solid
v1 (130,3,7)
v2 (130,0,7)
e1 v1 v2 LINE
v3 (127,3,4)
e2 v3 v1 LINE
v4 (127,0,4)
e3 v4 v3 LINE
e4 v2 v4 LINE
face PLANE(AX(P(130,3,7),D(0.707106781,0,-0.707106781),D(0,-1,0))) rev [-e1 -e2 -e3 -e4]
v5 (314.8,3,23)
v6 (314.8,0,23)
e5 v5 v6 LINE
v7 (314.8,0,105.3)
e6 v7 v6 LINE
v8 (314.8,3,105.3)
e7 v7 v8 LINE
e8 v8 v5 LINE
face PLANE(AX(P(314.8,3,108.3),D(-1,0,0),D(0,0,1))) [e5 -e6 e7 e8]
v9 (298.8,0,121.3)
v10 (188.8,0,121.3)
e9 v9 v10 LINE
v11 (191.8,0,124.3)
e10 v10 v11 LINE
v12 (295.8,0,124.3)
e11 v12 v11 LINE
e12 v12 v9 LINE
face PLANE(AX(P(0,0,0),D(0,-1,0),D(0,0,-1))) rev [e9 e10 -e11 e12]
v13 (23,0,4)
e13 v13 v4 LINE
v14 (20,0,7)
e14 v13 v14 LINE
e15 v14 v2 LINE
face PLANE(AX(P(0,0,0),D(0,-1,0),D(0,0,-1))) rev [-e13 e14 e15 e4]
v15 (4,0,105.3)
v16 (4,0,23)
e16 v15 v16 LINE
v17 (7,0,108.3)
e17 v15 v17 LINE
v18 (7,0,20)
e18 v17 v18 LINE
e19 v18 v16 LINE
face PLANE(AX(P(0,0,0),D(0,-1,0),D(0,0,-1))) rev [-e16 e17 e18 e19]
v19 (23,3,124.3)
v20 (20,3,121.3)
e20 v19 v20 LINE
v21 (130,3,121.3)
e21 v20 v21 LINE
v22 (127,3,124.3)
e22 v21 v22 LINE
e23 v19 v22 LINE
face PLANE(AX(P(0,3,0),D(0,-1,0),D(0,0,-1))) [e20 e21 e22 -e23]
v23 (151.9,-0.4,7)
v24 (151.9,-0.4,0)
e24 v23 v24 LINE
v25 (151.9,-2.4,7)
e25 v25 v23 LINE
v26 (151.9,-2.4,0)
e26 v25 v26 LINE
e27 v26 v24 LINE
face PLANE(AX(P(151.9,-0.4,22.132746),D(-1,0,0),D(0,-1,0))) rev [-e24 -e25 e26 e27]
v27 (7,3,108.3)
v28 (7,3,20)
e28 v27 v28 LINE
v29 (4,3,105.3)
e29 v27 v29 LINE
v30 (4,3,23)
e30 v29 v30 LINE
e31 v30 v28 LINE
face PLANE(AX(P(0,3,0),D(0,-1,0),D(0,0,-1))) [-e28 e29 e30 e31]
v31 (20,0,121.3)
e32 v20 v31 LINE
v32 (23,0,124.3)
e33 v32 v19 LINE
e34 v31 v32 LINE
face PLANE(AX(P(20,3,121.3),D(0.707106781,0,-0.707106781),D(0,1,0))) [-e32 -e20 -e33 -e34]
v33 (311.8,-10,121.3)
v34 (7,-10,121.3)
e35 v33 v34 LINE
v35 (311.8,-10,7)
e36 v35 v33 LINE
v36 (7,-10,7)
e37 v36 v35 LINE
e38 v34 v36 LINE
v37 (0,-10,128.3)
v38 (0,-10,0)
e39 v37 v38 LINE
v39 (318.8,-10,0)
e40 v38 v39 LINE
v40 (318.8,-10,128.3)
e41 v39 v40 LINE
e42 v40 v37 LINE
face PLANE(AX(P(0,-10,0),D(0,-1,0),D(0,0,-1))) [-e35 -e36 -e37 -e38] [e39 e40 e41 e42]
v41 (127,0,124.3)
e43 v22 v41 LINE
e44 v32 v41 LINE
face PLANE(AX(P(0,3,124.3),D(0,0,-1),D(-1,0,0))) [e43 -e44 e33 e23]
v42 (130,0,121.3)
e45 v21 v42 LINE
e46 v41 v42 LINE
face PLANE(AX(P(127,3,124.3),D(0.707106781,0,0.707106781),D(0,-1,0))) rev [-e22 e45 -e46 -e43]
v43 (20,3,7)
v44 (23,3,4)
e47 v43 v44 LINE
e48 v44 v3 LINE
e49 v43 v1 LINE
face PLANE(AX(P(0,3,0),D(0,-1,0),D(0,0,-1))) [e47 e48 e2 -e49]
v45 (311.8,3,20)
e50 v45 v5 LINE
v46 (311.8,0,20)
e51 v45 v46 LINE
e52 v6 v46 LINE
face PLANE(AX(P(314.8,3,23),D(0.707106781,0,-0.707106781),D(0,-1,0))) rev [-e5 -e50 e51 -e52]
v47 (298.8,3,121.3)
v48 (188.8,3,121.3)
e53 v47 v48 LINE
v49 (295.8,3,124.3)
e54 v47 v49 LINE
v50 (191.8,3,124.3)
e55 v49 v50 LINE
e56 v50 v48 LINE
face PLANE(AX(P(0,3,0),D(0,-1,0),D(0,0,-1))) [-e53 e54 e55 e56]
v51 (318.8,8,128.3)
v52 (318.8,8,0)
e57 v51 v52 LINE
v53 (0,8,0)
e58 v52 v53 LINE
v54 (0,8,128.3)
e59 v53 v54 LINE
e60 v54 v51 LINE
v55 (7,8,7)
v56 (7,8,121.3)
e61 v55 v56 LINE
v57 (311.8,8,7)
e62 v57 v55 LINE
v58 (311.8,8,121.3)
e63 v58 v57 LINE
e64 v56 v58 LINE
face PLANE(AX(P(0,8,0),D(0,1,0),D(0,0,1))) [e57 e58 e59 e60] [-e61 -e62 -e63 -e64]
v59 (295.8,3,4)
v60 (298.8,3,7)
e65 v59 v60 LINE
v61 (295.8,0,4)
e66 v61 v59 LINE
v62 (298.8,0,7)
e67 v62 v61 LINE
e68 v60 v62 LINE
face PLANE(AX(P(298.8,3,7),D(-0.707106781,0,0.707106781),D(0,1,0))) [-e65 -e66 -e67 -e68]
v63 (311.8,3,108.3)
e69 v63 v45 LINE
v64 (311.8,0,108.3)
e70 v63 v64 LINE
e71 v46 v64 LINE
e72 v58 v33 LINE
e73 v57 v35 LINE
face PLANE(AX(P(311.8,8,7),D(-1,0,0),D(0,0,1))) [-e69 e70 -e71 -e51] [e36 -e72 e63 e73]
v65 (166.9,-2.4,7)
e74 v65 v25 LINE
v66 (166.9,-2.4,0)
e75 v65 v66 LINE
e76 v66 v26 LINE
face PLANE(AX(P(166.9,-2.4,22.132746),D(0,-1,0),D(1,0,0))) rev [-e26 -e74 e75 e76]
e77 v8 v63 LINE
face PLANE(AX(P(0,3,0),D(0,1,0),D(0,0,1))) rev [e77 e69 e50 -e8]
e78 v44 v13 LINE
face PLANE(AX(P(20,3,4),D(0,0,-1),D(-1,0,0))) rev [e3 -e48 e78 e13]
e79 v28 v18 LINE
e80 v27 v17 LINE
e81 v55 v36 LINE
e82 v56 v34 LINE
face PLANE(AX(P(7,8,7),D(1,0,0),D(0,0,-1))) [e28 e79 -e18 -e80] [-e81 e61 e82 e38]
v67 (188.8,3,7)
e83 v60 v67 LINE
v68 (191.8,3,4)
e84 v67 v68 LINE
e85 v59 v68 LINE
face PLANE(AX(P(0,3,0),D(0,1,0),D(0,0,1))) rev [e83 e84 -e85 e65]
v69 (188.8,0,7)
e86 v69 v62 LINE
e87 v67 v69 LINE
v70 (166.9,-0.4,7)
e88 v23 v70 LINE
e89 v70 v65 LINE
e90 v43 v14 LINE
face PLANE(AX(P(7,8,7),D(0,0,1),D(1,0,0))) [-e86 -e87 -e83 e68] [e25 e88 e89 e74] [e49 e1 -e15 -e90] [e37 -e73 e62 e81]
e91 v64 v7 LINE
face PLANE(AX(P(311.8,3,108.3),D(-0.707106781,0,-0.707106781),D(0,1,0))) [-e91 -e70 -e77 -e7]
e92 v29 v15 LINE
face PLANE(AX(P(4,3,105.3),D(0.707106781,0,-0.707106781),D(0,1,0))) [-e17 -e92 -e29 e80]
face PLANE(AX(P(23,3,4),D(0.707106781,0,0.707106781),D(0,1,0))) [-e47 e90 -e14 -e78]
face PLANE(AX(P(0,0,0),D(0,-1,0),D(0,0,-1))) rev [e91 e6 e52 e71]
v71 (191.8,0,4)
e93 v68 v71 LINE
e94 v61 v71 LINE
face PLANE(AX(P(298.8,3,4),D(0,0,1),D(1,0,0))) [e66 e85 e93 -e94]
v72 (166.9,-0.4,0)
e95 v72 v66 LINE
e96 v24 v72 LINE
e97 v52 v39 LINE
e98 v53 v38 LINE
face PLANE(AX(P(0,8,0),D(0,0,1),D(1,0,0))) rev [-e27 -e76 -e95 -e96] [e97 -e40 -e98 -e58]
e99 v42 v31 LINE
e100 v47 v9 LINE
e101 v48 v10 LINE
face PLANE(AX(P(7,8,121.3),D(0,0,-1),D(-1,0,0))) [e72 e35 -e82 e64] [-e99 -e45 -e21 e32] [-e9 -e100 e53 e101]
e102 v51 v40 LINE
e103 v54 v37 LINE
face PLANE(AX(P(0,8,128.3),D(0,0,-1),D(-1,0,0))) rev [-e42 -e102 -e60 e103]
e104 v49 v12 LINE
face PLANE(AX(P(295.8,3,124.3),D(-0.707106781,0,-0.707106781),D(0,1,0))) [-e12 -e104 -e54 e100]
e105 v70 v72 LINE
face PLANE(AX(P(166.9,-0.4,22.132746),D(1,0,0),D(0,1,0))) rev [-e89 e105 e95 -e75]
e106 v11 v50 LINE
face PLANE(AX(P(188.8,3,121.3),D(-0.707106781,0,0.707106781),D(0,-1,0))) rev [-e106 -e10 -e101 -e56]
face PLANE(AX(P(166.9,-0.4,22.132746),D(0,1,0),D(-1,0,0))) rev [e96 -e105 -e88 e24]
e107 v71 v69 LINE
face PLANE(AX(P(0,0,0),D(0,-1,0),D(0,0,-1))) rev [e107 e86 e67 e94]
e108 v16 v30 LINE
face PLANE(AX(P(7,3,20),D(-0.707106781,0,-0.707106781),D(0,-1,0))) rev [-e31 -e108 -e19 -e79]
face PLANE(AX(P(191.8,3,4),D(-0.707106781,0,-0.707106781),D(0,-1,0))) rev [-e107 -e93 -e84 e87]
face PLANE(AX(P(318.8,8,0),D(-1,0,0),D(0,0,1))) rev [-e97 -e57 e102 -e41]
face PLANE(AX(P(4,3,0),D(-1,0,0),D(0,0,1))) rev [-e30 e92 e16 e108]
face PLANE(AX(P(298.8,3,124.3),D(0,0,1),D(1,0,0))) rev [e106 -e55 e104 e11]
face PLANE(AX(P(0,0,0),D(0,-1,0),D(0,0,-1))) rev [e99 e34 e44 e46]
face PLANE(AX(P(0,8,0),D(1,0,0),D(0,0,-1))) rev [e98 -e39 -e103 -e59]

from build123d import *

# Parameters (mm, degrees)
SKETCH1_W           = 318.8
SKETCH1_H           = 128.3
SKETCH1_W_2         = 304.8
SKETCH1_H_2         = 114.3
BOSS_EXTRUDE1_DEPTH = 8
SKETCH2_W           = 110
SKETCH2_H           = 3
SKETCH2_W_2         = 3
SKETCH2_H_2         = 88.3
CUT_EXTRUDE1_DEPTH  = 3
CHAMFER1_SIZE       = 3
SKETCH3_W           = 318.8
SKETCH3_H           = 128.3
SKETCH3_W_2         = 304.8
SKETCH3_H_2         = 114.3
BOSS_EXTRUDE3_DEPTH = 10
SKETCH4_W           = 15
SKETCH4_H           = 2
CUT_EXTRUDE3_DEPTH  = 7


with BuildPart() as part:
    # Sketch1 → Boss-Extrude1 (new body)
    with BuildSketch(Plane(origin=(0, 0, 0), x_dir=(1, 0, 0), z_dir=(0, 1, 0))):
        with Locations((159.4, -64.15)):
            Rectangle(SKETCH1_W, SKETCH1_H)
        with Locations((159.4, -64.15)):
            Rectangle(SKETCH1_W_2, SKETCH1_H_2, mode=Mode.SUBTRACT)
    extrude(amount=BOSS_EXTRUDE1_DEPTH)

    # Sketch2 → Cut-Extrude1 (cut)
    with BuildSketch(Plane.XZ):
        with Locations((75, 122.8)):
            Rectangle(SKETCH2_W, SKETCH2_H)
        with Locations((5.5, 64.15)):
            Rectangle(SKETCH2_W_2, SKETCH2_H_2)
        with Locations((313.3, 64.15)):
            Rectangle(SKETCH2_W_2, SKETCH2_H_2)
        with Locations((75, 5.5)):
            Rectangle(SKETCH2_W, SKETCH2_H)
        with Locations((243.8, 5.5)):
            Rectangle(SKETCH2_W, SKETCH2_H)
        with Locations((243.8, 122.8)):
            Rectangle(SKETCH2_W, SKETCH2_H)
    extrude(amount=-CUT_EXTRUDE1_DEPTH, mode=Mode.SUBTRACT)

    # Chamfer1
    chamfer1_edges = [part.edges().sort_by_distance(p)[0] for p in [
        (298.8, 1.5, 4),
        (314.8, 1.5, 20),
        (130, 1.5, 4),
        (188.8, 1.5, 4),
        (20, 1.5, 4),
        (4, 1.5, 20),
        (4, 1.5, 108.3),
        (314.8, 1.5, 108.3),
        (298.8, 1.5, 124.3),
        (188.8, 1.5, 124.3),
        (130, 1.5, 124.3),
        (20, 1.5, 124.3),
    ]]
    chamfer(chamfer1_edges, length=CHAMFER1_SIZE - 0.0001)  # a hair under: the kernel refuses the full size

    # Sketch3 → Boss-Extrude3 (add)
    with BuildSketch(Plane.XZ):
        with Locations((159.4, 64.15)):
            Rectangle(SKETCH3_W, SKETCH3_H)
        with Locations((159.4, 64.15)):
            Rectangle(SKETCH3_W_2, SKETCH3_H_2, mode=Mode.SUBTRACT)
    extrude(amount=BOSS_EXTRUDE3_DEPTH)

    # Sketch4 → Cut-Extrude3 (cut)
    with BuildSketch(Plane(origin=(0, 0, 0), x_dir=(-1, 0, 0), z_dir=(0, 0, -1))):
        with Locations((-159.4, -1.4)):
            Rectangle(SKETCH4_W, SKETCH4_H)
    extrude(amount=-CUT_EXTRUDE3_DEPTH, mode=Mode.SUBTRACT)


solid = part.part
